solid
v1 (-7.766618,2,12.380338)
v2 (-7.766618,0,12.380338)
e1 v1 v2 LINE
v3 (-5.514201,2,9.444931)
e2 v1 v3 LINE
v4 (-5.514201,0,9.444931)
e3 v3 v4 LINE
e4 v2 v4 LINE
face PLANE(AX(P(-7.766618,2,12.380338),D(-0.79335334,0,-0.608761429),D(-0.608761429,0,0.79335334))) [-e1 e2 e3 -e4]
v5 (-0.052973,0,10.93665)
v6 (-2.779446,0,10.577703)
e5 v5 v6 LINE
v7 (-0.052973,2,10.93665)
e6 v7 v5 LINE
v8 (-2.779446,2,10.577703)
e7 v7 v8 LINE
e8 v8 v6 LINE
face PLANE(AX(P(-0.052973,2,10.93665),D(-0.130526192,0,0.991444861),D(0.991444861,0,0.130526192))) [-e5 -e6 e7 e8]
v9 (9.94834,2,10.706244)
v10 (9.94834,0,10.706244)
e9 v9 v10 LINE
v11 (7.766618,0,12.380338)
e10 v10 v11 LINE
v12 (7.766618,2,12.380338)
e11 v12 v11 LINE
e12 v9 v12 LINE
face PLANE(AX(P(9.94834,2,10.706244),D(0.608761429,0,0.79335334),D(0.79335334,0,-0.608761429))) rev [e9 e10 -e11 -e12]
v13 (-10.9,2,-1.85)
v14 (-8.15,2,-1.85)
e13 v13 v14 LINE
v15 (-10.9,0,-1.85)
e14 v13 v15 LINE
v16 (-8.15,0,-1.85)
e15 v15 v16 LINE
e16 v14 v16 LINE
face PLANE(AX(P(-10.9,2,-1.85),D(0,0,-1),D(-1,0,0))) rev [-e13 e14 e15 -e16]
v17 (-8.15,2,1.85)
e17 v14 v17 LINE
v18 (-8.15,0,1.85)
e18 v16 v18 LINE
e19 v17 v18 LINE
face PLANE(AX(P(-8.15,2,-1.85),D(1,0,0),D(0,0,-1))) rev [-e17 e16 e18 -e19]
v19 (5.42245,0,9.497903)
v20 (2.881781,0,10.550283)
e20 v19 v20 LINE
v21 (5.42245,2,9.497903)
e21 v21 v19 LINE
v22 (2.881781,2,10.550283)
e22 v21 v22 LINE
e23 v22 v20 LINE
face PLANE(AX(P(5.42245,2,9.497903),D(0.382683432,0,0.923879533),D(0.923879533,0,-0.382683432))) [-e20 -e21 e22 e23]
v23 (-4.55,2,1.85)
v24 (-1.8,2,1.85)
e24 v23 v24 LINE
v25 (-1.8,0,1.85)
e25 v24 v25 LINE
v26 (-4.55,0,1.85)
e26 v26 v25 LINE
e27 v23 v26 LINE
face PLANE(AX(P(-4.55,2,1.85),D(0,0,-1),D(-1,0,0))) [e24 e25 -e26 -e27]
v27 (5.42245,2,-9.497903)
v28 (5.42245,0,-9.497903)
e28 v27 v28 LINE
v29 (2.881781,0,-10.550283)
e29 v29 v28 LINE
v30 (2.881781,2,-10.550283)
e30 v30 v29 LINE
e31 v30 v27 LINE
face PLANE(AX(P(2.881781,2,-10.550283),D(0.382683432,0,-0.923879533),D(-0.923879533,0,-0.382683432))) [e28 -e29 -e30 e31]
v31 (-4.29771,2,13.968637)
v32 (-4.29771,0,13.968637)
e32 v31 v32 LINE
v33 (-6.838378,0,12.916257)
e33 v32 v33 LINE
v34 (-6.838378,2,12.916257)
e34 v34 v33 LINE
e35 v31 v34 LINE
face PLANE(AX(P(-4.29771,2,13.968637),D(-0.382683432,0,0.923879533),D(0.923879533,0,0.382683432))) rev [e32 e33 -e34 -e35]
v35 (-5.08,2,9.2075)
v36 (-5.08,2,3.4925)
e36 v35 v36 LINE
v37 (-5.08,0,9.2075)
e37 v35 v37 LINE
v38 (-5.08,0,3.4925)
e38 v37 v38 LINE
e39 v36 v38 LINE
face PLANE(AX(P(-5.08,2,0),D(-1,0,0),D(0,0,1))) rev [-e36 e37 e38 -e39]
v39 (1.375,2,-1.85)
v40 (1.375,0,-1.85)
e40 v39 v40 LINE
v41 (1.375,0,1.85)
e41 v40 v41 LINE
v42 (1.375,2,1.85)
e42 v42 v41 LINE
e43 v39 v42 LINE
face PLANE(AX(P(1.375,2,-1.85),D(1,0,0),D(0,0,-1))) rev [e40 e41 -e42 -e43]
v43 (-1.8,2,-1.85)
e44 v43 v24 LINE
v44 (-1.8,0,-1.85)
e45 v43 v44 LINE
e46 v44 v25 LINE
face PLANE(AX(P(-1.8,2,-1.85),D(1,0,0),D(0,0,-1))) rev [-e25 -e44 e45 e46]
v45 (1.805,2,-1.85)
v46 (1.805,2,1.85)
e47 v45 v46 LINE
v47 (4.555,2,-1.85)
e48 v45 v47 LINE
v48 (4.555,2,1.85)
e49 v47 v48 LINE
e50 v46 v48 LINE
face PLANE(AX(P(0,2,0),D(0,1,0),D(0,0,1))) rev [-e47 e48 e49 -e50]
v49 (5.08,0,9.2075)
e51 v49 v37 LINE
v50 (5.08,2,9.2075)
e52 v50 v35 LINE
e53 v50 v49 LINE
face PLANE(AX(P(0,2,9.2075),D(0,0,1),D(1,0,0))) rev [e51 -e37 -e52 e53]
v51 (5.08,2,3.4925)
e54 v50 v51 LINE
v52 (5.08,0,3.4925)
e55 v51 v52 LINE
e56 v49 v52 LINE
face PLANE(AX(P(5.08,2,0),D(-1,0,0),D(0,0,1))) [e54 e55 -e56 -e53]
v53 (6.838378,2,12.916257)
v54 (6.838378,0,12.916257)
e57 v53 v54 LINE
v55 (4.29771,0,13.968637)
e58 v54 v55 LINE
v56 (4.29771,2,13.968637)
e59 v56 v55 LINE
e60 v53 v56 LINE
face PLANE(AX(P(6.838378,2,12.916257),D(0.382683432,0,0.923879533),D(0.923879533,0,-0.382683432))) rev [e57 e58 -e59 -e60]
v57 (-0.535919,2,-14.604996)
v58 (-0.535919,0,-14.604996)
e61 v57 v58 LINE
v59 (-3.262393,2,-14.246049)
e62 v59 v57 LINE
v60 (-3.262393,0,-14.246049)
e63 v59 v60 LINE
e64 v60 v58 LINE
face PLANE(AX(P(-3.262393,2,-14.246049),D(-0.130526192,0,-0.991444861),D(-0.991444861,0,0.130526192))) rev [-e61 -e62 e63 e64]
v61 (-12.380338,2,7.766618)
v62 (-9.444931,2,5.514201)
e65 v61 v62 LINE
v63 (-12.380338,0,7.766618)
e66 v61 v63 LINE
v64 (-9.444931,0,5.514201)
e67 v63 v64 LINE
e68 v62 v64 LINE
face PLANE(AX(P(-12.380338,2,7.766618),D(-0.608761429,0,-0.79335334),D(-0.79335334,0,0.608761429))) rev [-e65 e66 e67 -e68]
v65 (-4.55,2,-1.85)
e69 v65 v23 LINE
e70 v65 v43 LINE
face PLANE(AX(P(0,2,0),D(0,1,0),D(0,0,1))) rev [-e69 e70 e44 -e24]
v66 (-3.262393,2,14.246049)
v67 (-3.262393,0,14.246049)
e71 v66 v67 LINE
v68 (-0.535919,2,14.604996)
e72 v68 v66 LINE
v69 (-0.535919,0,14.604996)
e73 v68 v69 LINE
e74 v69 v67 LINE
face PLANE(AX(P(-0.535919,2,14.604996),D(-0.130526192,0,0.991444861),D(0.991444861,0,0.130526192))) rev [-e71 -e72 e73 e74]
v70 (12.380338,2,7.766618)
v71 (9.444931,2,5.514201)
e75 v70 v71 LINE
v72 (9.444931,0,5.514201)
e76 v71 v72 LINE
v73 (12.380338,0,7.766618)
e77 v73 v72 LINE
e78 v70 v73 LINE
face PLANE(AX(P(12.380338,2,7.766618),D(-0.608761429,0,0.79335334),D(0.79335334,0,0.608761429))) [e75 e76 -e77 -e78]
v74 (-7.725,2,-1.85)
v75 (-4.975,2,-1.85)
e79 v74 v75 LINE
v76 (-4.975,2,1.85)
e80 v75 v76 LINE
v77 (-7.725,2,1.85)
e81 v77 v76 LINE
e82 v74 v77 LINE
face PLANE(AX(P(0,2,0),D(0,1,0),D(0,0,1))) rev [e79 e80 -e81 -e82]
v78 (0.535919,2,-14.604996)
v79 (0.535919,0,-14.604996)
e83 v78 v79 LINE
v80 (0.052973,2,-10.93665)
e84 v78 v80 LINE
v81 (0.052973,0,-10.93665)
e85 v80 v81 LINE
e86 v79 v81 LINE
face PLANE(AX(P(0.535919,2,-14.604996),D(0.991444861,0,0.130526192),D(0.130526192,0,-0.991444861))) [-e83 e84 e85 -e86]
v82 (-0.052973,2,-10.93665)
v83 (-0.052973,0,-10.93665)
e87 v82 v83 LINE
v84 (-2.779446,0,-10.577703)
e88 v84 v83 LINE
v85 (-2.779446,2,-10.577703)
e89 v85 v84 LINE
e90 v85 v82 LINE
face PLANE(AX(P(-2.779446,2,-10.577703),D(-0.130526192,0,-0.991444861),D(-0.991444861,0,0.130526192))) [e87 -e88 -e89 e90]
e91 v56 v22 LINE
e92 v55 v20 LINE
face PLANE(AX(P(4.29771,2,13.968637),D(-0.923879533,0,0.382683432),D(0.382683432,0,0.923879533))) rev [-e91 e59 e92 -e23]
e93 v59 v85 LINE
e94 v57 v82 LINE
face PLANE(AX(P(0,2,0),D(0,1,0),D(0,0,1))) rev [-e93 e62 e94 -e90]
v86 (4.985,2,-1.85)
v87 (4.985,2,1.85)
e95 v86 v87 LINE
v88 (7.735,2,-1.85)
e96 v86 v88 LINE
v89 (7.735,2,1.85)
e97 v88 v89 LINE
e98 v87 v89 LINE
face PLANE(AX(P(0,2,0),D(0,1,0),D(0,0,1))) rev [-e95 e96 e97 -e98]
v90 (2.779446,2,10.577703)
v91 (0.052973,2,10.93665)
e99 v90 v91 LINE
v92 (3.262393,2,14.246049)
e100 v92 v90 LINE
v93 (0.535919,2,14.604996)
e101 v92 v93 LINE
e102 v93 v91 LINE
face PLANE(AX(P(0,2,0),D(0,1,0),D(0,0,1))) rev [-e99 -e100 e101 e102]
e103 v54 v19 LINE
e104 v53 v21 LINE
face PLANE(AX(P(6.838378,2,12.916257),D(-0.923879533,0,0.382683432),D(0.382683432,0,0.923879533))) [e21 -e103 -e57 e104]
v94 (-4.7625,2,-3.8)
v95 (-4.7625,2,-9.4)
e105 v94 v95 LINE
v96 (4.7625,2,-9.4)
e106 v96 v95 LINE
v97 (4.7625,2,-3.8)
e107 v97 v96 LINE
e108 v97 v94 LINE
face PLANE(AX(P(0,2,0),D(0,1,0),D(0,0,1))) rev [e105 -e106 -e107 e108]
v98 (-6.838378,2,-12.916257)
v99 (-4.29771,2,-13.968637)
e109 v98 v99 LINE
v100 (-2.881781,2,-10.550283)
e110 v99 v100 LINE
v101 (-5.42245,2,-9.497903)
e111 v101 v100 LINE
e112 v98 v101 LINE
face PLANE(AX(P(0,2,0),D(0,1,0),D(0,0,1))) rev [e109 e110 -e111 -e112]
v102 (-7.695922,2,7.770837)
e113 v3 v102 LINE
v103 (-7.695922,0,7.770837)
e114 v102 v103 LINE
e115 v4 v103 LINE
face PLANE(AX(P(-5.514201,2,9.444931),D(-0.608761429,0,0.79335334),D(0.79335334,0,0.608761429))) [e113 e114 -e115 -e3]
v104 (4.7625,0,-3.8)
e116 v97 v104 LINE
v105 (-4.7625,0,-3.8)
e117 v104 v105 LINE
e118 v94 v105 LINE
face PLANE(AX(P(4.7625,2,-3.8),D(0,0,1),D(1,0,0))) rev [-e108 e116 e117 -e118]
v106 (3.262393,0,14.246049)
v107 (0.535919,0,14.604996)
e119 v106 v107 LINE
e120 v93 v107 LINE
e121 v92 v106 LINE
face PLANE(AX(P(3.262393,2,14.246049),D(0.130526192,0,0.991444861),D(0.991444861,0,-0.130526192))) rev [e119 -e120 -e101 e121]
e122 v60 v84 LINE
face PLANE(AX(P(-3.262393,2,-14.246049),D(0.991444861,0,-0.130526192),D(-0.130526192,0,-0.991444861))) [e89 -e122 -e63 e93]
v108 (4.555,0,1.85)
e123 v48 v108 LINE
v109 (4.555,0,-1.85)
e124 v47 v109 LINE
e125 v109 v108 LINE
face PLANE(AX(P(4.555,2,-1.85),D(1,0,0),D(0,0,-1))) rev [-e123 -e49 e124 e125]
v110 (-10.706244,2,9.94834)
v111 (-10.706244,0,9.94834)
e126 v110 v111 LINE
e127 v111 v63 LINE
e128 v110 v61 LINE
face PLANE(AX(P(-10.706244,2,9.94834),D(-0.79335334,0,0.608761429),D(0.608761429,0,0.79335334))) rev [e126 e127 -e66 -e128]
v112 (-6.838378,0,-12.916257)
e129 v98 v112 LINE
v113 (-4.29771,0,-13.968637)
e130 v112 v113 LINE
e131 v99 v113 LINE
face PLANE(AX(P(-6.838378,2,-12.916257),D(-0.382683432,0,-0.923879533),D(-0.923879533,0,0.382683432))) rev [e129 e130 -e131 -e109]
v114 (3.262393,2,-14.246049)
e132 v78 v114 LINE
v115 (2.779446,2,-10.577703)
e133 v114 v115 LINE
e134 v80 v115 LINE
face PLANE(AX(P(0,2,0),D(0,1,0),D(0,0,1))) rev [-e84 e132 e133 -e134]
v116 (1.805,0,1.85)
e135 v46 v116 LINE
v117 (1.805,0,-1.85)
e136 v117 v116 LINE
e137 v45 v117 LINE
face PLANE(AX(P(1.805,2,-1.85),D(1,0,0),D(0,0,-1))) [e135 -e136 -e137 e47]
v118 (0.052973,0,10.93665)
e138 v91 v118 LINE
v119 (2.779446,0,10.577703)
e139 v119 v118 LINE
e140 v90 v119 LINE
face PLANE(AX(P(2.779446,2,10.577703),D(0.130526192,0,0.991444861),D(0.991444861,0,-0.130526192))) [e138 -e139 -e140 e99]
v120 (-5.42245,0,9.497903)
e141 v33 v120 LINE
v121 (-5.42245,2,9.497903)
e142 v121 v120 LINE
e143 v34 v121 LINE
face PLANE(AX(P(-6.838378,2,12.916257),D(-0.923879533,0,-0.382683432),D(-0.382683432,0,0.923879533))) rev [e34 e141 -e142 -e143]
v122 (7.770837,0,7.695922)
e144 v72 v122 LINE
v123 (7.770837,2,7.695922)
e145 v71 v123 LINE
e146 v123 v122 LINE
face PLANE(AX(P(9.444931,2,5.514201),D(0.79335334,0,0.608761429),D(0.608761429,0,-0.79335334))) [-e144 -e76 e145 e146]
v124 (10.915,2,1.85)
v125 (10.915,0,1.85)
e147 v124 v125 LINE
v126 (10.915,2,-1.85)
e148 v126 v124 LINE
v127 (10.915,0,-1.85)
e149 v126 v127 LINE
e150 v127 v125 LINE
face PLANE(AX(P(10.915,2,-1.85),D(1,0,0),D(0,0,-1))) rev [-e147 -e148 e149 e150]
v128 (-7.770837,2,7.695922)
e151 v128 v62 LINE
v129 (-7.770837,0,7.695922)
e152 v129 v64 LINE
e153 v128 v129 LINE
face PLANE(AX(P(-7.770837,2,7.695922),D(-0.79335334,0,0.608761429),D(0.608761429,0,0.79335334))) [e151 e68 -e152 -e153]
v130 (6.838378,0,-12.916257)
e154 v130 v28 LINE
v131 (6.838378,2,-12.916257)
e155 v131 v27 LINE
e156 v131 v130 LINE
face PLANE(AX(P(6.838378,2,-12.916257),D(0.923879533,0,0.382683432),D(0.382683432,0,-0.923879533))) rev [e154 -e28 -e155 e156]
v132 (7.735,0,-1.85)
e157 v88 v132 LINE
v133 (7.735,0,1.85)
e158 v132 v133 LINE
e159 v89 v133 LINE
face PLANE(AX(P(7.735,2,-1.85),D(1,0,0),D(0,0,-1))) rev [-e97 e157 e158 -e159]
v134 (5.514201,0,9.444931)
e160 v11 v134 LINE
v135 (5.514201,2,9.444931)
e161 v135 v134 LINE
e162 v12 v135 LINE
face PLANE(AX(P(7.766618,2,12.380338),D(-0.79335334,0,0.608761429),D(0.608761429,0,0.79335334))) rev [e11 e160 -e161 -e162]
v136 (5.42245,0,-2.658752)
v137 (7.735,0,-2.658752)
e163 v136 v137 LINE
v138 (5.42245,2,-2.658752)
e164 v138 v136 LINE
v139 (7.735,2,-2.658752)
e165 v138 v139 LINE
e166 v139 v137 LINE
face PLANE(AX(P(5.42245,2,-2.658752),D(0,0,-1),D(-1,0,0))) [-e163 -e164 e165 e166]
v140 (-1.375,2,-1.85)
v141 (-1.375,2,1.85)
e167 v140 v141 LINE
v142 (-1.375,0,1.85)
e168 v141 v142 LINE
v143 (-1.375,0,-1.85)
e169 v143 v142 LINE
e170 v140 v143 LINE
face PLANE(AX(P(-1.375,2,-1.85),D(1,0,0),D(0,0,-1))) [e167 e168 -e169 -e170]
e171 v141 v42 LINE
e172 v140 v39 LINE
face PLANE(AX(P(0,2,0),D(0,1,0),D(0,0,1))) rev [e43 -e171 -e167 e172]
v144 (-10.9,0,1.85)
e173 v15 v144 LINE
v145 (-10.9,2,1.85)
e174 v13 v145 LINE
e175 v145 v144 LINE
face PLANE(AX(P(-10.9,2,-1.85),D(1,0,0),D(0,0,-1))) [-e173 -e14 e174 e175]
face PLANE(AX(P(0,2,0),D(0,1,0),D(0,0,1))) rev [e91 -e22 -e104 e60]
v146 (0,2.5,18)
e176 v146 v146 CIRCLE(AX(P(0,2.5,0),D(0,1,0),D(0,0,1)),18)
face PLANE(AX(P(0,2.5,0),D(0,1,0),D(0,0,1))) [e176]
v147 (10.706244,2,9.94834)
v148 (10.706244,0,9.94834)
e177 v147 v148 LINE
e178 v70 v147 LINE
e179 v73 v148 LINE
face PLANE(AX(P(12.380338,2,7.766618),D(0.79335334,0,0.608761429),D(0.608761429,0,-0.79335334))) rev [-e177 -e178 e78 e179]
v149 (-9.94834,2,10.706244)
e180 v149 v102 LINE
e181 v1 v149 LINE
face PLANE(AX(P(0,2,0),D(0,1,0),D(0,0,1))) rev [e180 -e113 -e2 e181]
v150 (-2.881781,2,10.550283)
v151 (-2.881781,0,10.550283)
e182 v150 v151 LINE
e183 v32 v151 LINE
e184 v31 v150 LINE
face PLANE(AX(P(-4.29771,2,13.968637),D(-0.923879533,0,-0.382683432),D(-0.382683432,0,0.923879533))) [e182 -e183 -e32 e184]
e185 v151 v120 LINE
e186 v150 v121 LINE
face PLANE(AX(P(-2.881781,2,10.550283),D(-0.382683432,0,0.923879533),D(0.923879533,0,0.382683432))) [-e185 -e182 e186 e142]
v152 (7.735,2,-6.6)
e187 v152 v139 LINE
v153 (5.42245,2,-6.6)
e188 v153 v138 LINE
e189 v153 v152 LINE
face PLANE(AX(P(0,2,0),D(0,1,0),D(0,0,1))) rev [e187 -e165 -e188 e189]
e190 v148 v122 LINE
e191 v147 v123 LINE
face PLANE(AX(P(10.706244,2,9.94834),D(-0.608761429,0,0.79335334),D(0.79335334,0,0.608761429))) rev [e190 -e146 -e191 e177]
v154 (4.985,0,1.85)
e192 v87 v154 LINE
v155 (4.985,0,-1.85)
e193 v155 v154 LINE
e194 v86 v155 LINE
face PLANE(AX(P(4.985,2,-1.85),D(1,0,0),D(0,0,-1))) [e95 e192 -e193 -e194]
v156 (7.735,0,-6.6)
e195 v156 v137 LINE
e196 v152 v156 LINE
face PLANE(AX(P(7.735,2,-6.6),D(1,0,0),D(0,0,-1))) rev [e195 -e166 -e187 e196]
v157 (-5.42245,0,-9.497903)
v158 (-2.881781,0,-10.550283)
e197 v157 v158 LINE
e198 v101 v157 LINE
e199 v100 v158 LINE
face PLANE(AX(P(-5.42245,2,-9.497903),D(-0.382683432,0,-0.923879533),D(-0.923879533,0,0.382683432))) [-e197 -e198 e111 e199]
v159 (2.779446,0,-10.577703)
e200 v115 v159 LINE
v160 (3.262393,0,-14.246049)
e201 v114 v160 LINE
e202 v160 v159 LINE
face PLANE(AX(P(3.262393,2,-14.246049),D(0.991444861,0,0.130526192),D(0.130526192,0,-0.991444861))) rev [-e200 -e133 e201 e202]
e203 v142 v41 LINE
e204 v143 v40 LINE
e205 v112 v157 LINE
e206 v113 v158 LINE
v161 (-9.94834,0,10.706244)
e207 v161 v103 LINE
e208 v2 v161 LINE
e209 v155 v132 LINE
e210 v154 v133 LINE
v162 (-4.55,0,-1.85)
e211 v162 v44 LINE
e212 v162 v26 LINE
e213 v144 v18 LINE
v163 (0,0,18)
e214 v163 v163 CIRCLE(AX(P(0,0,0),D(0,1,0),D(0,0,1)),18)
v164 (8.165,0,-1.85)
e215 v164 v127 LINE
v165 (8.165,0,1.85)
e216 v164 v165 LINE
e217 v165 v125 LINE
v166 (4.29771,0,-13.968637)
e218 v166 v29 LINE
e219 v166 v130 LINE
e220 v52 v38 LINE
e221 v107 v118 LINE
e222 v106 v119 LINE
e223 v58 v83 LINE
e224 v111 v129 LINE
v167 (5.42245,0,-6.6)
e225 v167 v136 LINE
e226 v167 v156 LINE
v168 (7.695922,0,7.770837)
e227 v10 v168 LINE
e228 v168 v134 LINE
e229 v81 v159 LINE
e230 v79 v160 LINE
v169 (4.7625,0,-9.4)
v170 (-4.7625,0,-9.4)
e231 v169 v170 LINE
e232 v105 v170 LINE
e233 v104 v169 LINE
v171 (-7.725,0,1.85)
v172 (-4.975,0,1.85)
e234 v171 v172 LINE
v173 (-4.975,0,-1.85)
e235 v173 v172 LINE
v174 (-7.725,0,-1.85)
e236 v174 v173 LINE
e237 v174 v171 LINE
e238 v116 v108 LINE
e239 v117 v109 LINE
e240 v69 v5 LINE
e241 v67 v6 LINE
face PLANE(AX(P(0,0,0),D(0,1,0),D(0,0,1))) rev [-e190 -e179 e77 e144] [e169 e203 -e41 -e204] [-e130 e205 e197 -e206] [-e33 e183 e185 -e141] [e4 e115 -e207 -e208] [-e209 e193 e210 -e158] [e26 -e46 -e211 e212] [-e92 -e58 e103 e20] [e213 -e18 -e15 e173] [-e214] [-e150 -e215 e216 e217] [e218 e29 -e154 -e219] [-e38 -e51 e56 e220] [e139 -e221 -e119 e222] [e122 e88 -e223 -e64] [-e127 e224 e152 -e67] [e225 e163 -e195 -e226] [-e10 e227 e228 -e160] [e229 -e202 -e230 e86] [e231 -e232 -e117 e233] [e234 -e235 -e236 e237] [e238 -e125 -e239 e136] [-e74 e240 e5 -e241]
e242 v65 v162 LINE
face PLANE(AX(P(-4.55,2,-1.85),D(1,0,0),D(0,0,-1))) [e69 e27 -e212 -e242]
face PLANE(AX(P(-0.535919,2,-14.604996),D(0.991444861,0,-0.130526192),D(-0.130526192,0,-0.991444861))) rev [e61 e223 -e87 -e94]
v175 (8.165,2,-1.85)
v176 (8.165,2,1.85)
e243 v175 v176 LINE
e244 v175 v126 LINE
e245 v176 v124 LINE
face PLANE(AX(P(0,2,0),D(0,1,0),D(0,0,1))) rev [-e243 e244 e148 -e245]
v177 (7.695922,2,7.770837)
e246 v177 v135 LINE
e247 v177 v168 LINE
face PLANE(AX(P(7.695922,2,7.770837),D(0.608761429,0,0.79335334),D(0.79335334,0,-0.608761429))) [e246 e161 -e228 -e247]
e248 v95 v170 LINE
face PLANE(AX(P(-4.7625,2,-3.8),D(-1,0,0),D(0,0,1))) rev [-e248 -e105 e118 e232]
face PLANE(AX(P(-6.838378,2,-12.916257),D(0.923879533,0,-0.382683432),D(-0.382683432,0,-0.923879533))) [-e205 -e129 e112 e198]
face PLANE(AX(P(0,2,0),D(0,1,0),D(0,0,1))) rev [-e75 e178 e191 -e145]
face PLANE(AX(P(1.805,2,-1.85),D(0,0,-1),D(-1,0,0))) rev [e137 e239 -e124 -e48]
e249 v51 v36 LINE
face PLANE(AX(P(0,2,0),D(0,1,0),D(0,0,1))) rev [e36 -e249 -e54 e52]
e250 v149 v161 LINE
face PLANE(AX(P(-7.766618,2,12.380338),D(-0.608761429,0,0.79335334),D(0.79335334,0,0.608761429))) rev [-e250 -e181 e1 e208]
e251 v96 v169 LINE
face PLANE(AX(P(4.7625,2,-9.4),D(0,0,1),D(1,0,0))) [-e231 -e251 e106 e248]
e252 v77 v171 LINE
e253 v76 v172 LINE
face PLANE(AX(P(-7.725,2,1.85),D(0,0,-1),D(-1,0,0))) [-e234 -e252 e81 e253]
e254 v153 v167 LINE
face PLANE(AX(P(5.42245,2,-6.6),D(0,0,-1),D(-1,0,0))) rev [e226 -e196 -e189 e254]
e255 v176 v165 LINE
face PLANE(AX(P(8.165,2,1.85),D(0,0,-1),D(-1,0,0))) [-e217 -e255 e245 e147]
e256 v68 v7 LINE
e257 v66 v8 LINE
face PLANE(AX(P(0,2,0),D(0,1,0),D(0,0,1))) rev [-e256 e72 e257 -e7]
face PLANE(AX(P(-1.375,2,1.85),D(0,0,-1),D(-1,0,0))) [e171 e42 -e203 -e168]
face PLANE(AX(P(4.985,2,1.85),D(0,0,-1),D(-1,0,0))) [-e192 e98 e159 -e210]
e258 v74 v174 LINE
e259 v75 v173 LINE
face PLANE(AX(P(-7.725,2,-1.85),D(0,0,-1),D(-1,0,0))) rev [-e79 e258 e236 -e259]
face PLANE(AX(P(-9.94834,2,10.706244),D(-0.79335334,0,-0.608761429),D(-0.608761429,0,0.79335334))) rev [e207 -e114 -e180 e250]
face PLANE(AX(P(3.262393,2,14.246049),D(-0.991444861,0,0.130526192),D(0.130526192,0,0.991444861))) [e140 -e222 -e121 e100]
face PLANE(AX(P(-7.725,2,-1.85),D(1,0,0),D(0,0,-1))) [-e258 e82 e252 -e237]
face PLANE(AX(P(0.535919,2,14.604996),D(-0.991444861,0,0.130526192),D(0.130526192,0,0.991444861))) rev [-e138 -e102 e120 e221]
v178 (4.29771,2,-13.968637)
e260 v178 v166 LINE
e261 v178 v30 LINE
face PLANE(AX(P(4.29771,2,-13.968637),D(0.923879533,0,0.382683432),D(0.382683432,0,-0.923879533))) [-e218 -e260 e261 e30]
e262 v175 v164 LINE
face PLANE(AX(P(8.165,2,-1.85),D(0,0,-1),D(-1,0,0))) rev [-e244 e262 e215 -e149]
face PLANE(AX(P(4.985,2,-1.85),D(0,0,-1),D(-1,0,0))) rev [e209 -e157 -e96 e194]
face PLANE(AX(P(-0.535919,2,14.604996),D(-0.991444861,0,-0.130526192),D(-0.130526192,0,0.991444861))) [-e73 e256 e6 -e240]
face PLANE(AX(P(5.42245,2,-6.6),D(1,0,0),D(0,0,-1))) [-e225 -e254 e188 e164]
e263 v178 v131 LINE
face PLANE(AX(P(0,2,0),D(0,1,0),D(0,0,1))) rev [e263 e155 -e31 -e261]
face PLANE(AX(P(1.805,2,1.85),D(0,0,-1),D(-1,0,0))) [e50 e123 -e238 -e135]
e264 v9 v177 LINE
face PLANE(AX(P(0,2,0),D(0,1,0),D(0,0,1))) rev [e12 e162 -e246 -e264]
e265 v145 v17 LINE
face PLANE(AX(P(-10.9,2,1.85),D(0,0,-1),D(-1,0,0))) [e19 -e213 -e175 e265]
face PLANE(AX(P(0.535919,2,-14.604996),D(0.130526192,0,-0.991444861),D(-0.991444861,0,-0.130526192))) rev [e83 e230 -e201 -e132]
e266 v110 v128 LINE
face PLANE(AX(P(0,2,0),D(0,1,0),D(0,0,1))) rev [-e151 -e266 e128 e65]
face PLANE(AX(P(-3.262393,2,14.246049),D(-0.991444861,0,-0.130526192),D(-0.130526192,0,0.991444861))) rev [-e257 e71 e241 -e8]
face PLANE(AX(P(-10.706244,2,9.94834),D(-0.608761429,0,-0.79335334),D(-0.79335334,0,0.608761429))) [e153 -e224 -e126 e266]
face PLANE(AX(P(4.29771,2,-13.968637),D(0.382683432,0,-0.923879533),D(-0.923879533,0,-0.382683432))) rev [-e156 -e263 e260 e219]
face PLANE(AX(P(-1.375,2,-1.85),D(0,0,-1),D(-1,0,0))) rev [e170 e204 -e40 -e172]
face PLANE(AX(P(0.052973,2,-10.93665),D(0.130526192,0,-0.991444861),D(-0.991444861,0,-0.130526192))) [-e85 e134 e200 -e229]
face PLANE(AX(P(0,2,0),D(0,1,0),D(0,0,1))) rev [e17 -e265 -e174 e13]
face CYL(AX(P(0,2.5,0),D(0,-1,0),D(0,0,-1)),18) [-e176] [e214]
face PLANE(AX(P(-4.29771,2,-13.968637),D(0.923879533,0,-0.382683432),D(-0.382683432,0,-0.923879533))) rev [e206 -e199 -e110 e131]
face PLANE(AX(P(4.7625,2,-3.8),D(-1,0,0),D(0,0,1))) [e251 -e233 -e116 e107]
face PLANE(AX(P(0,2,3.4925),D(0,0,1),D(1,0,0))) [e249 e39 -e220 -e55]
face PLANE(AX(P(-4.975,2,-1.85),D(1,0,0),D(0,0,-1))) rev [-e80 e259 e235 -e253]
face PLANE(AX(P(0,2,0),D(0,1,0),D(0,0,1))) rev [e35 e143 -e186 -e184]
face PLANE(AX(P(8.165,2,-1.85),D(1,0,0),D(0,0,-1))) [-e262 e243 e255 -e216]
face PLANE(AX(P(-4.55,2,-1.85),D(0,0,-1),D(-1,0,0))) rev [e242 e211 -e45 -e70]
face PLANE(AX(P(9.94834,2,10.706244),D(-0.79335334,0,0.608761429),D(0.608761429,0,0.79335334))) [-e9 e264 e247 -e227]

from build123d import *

# Parameters (mm, degrees)
SKETCH1_R                = 18
BOSS_EXTRUDE1_DEPTH      = 2.5
CUT_EXTRUDE4_OUTLINE_W   = 10.16
CUT_EXTRUDE4_OUTLINE_H   = 5.715
CUT_EXTRUDE4_OUTLINE_W_2 = 2.312550402
CUT_EXTRUDE4_OUTLINE_H_2 = 3.94124845
CUT_EXTRUDE4_OUTLINE_W_3 = 2.75
CUT_EXTRUDE4_OUTLINE_H_3 = 3.7
CUT_EXTRUDE4_OUTLINE_W_4 = 9.525
CUT_EXTRUDE4_OUTLINE_H_4 = 5.6
CUT_EXTRUDE4_DEPTH       = 2


# Read off the part's stored shape, not the designer's step: Cut-Extrude4
with BuildPart() as part:
    # Sketch1 → Boss-Extrude1 (new body)
    with BuildSketch(Plane(origin=(0, 0, 0), x_dir=(1, 0, 0), z_dir=(0, 1, 0))):
        with Locations(Location((0, 0, 0), (0, 0, 270))):
            Circle(SKETCH1_R)
    extrude(amount=BOSS_EXTRUDE1_DEPTH)

    # Cut-Extrude4 outline → Cut-Extrude4 (cut)
    with BuildSketch(Plane(origin=(0, 0, 0), x_dir=(1, 0, 0), z_dir=(0, 1, 0))):
        with Locations((0, -6.35)):
            Rectangle(CUT_EXTRUDE4_OUTLINE_W, CUT_EXTRUDE4_OUTLINE_H)
        with Locations((6.578724799, 4.629375775)):
            Rectangle(CUT_EXTRUDE4_OUTLINE_W_2, CUT_EXTRUDE4_OUTLINE_H_2)
        with Locations((6.36, 0)):
            Rectangle(CUT_EXTRUDE4_OUTLINE_W_3, CUT_EXTRUDE4_OUTLINE_H_3)
        Polygon((-4.297709584, -13.968636918), (-2.881780884, -10.550282647), (-5.422449598, -9.497903208), (-6.838378298, -12.916257479), align=None)
        Polygon((2.881780884, 10.550282647), (5.422449598, 9.497903208), (6.838378298, 12.916257479), (4.297709584, 13.968636918), align=None)
        Polygon((-0.535919412, -14.604996247), (-0.052972501, -10.93665026), (-2.77944587, -10.577703232), (-3.262392781, -14.246049219), align=None)
        Polygon((0.052972501, 10.93665026), (2.77944587, 10.577703232), (3.262392781, 14.246049219), (0.535919412, 14.604996247), align=None)
        Polygon((-10.706244136, -9.948339635), (-7.770836777, -7.695922348), (-9.444930707, -5.514200662), (-12.380338066, -7.766617949), align=None)
        Polygon((-7.766617949, -12.380338066), (-5.514200662, -9.444930707), (-7.695922348, -7.770836777), (-9.948339635, -10.706244136), align=None)
        with Locations((-3.175, 0)):
            Rectangle(CUT_EXTRUDE4_OUTLINE_W_3, CUT_EXTRUDE4_OUTLINE_H_3)
        with Locations((-6.35, 0)):
            Rectangle(CUT_EXTRUDE4_OUTLINE_W_3, CUT_EXTRUDE4_OUTLINE_H_3)
        with Locations((-9.525, 0)):
            Rectangle(CUT_EXTRUDE4_OUTLINE_W_3, CUT_EXTRUDE4_OUTLINE_H_3)
        Rectangle(CUT_EXTRUDE4_OUTLINE_W_3, CUT_EXTRUDE4_OUTLINE_H_3)
        with Locations((3.18, 0)):
            Rectangle(CUT_EXTRUDE4_OUTLINE_W_3, CUT_EXTRUDE4_OUTLINE_H_3)
        with Locations((9.54, 0)):
            Rectangle(CUT_EXTRUDE4_OUTLINE_W_3, CUT_EXTRUDE4_OUTLINE_H_3)
        with Locations((0, 6.6)):
            Rectangle(CUT_EXTRUDE4_OUTLINE_W_4, CUT_EXTRUDE4_OUTLINE_H_4)
        Polygon((-6.838378298, 12.916257479), (-5.422449598, 9.497903208), (-2.881780884, 10.550282647), (-4.297709584, 13.968636918), align=None)
        Polygon((5.422449598, -9.497903208), (2.881780884, -10.550282647), (4.297709584, -13.968636918), (6.838378298, -12.916257479), align=None)
        Polygon((-3.262392781, 14.246049219), (-2.77944587, 10.577703232), (-0.052972501, 10.93665026), (-0.535919412, 14.604996247), align=None)
        Polygon((2.77944587, -10.577703232), (0.052972501, -10.93665026), (0.535919412, -14.604996247), (3.262392781, -14.246049219), align=None)
        Polygon((12.380338066, -7.766617949), (9.444930707, -5.514200662), (7.770836777, -7.695922348), (10.706244136, -9.948339635), align=None)
        Polygon((9.948339635, -10.706244136), (7.695922348, -7.770836777), (5.514200662, -9.444930707), (7.766617949, -12.380338066), align=None)
    extrude(amount=CUT_EXTRUDE4_DEPTH, mode=Mode.SUBTRACT)


solid = part.part
